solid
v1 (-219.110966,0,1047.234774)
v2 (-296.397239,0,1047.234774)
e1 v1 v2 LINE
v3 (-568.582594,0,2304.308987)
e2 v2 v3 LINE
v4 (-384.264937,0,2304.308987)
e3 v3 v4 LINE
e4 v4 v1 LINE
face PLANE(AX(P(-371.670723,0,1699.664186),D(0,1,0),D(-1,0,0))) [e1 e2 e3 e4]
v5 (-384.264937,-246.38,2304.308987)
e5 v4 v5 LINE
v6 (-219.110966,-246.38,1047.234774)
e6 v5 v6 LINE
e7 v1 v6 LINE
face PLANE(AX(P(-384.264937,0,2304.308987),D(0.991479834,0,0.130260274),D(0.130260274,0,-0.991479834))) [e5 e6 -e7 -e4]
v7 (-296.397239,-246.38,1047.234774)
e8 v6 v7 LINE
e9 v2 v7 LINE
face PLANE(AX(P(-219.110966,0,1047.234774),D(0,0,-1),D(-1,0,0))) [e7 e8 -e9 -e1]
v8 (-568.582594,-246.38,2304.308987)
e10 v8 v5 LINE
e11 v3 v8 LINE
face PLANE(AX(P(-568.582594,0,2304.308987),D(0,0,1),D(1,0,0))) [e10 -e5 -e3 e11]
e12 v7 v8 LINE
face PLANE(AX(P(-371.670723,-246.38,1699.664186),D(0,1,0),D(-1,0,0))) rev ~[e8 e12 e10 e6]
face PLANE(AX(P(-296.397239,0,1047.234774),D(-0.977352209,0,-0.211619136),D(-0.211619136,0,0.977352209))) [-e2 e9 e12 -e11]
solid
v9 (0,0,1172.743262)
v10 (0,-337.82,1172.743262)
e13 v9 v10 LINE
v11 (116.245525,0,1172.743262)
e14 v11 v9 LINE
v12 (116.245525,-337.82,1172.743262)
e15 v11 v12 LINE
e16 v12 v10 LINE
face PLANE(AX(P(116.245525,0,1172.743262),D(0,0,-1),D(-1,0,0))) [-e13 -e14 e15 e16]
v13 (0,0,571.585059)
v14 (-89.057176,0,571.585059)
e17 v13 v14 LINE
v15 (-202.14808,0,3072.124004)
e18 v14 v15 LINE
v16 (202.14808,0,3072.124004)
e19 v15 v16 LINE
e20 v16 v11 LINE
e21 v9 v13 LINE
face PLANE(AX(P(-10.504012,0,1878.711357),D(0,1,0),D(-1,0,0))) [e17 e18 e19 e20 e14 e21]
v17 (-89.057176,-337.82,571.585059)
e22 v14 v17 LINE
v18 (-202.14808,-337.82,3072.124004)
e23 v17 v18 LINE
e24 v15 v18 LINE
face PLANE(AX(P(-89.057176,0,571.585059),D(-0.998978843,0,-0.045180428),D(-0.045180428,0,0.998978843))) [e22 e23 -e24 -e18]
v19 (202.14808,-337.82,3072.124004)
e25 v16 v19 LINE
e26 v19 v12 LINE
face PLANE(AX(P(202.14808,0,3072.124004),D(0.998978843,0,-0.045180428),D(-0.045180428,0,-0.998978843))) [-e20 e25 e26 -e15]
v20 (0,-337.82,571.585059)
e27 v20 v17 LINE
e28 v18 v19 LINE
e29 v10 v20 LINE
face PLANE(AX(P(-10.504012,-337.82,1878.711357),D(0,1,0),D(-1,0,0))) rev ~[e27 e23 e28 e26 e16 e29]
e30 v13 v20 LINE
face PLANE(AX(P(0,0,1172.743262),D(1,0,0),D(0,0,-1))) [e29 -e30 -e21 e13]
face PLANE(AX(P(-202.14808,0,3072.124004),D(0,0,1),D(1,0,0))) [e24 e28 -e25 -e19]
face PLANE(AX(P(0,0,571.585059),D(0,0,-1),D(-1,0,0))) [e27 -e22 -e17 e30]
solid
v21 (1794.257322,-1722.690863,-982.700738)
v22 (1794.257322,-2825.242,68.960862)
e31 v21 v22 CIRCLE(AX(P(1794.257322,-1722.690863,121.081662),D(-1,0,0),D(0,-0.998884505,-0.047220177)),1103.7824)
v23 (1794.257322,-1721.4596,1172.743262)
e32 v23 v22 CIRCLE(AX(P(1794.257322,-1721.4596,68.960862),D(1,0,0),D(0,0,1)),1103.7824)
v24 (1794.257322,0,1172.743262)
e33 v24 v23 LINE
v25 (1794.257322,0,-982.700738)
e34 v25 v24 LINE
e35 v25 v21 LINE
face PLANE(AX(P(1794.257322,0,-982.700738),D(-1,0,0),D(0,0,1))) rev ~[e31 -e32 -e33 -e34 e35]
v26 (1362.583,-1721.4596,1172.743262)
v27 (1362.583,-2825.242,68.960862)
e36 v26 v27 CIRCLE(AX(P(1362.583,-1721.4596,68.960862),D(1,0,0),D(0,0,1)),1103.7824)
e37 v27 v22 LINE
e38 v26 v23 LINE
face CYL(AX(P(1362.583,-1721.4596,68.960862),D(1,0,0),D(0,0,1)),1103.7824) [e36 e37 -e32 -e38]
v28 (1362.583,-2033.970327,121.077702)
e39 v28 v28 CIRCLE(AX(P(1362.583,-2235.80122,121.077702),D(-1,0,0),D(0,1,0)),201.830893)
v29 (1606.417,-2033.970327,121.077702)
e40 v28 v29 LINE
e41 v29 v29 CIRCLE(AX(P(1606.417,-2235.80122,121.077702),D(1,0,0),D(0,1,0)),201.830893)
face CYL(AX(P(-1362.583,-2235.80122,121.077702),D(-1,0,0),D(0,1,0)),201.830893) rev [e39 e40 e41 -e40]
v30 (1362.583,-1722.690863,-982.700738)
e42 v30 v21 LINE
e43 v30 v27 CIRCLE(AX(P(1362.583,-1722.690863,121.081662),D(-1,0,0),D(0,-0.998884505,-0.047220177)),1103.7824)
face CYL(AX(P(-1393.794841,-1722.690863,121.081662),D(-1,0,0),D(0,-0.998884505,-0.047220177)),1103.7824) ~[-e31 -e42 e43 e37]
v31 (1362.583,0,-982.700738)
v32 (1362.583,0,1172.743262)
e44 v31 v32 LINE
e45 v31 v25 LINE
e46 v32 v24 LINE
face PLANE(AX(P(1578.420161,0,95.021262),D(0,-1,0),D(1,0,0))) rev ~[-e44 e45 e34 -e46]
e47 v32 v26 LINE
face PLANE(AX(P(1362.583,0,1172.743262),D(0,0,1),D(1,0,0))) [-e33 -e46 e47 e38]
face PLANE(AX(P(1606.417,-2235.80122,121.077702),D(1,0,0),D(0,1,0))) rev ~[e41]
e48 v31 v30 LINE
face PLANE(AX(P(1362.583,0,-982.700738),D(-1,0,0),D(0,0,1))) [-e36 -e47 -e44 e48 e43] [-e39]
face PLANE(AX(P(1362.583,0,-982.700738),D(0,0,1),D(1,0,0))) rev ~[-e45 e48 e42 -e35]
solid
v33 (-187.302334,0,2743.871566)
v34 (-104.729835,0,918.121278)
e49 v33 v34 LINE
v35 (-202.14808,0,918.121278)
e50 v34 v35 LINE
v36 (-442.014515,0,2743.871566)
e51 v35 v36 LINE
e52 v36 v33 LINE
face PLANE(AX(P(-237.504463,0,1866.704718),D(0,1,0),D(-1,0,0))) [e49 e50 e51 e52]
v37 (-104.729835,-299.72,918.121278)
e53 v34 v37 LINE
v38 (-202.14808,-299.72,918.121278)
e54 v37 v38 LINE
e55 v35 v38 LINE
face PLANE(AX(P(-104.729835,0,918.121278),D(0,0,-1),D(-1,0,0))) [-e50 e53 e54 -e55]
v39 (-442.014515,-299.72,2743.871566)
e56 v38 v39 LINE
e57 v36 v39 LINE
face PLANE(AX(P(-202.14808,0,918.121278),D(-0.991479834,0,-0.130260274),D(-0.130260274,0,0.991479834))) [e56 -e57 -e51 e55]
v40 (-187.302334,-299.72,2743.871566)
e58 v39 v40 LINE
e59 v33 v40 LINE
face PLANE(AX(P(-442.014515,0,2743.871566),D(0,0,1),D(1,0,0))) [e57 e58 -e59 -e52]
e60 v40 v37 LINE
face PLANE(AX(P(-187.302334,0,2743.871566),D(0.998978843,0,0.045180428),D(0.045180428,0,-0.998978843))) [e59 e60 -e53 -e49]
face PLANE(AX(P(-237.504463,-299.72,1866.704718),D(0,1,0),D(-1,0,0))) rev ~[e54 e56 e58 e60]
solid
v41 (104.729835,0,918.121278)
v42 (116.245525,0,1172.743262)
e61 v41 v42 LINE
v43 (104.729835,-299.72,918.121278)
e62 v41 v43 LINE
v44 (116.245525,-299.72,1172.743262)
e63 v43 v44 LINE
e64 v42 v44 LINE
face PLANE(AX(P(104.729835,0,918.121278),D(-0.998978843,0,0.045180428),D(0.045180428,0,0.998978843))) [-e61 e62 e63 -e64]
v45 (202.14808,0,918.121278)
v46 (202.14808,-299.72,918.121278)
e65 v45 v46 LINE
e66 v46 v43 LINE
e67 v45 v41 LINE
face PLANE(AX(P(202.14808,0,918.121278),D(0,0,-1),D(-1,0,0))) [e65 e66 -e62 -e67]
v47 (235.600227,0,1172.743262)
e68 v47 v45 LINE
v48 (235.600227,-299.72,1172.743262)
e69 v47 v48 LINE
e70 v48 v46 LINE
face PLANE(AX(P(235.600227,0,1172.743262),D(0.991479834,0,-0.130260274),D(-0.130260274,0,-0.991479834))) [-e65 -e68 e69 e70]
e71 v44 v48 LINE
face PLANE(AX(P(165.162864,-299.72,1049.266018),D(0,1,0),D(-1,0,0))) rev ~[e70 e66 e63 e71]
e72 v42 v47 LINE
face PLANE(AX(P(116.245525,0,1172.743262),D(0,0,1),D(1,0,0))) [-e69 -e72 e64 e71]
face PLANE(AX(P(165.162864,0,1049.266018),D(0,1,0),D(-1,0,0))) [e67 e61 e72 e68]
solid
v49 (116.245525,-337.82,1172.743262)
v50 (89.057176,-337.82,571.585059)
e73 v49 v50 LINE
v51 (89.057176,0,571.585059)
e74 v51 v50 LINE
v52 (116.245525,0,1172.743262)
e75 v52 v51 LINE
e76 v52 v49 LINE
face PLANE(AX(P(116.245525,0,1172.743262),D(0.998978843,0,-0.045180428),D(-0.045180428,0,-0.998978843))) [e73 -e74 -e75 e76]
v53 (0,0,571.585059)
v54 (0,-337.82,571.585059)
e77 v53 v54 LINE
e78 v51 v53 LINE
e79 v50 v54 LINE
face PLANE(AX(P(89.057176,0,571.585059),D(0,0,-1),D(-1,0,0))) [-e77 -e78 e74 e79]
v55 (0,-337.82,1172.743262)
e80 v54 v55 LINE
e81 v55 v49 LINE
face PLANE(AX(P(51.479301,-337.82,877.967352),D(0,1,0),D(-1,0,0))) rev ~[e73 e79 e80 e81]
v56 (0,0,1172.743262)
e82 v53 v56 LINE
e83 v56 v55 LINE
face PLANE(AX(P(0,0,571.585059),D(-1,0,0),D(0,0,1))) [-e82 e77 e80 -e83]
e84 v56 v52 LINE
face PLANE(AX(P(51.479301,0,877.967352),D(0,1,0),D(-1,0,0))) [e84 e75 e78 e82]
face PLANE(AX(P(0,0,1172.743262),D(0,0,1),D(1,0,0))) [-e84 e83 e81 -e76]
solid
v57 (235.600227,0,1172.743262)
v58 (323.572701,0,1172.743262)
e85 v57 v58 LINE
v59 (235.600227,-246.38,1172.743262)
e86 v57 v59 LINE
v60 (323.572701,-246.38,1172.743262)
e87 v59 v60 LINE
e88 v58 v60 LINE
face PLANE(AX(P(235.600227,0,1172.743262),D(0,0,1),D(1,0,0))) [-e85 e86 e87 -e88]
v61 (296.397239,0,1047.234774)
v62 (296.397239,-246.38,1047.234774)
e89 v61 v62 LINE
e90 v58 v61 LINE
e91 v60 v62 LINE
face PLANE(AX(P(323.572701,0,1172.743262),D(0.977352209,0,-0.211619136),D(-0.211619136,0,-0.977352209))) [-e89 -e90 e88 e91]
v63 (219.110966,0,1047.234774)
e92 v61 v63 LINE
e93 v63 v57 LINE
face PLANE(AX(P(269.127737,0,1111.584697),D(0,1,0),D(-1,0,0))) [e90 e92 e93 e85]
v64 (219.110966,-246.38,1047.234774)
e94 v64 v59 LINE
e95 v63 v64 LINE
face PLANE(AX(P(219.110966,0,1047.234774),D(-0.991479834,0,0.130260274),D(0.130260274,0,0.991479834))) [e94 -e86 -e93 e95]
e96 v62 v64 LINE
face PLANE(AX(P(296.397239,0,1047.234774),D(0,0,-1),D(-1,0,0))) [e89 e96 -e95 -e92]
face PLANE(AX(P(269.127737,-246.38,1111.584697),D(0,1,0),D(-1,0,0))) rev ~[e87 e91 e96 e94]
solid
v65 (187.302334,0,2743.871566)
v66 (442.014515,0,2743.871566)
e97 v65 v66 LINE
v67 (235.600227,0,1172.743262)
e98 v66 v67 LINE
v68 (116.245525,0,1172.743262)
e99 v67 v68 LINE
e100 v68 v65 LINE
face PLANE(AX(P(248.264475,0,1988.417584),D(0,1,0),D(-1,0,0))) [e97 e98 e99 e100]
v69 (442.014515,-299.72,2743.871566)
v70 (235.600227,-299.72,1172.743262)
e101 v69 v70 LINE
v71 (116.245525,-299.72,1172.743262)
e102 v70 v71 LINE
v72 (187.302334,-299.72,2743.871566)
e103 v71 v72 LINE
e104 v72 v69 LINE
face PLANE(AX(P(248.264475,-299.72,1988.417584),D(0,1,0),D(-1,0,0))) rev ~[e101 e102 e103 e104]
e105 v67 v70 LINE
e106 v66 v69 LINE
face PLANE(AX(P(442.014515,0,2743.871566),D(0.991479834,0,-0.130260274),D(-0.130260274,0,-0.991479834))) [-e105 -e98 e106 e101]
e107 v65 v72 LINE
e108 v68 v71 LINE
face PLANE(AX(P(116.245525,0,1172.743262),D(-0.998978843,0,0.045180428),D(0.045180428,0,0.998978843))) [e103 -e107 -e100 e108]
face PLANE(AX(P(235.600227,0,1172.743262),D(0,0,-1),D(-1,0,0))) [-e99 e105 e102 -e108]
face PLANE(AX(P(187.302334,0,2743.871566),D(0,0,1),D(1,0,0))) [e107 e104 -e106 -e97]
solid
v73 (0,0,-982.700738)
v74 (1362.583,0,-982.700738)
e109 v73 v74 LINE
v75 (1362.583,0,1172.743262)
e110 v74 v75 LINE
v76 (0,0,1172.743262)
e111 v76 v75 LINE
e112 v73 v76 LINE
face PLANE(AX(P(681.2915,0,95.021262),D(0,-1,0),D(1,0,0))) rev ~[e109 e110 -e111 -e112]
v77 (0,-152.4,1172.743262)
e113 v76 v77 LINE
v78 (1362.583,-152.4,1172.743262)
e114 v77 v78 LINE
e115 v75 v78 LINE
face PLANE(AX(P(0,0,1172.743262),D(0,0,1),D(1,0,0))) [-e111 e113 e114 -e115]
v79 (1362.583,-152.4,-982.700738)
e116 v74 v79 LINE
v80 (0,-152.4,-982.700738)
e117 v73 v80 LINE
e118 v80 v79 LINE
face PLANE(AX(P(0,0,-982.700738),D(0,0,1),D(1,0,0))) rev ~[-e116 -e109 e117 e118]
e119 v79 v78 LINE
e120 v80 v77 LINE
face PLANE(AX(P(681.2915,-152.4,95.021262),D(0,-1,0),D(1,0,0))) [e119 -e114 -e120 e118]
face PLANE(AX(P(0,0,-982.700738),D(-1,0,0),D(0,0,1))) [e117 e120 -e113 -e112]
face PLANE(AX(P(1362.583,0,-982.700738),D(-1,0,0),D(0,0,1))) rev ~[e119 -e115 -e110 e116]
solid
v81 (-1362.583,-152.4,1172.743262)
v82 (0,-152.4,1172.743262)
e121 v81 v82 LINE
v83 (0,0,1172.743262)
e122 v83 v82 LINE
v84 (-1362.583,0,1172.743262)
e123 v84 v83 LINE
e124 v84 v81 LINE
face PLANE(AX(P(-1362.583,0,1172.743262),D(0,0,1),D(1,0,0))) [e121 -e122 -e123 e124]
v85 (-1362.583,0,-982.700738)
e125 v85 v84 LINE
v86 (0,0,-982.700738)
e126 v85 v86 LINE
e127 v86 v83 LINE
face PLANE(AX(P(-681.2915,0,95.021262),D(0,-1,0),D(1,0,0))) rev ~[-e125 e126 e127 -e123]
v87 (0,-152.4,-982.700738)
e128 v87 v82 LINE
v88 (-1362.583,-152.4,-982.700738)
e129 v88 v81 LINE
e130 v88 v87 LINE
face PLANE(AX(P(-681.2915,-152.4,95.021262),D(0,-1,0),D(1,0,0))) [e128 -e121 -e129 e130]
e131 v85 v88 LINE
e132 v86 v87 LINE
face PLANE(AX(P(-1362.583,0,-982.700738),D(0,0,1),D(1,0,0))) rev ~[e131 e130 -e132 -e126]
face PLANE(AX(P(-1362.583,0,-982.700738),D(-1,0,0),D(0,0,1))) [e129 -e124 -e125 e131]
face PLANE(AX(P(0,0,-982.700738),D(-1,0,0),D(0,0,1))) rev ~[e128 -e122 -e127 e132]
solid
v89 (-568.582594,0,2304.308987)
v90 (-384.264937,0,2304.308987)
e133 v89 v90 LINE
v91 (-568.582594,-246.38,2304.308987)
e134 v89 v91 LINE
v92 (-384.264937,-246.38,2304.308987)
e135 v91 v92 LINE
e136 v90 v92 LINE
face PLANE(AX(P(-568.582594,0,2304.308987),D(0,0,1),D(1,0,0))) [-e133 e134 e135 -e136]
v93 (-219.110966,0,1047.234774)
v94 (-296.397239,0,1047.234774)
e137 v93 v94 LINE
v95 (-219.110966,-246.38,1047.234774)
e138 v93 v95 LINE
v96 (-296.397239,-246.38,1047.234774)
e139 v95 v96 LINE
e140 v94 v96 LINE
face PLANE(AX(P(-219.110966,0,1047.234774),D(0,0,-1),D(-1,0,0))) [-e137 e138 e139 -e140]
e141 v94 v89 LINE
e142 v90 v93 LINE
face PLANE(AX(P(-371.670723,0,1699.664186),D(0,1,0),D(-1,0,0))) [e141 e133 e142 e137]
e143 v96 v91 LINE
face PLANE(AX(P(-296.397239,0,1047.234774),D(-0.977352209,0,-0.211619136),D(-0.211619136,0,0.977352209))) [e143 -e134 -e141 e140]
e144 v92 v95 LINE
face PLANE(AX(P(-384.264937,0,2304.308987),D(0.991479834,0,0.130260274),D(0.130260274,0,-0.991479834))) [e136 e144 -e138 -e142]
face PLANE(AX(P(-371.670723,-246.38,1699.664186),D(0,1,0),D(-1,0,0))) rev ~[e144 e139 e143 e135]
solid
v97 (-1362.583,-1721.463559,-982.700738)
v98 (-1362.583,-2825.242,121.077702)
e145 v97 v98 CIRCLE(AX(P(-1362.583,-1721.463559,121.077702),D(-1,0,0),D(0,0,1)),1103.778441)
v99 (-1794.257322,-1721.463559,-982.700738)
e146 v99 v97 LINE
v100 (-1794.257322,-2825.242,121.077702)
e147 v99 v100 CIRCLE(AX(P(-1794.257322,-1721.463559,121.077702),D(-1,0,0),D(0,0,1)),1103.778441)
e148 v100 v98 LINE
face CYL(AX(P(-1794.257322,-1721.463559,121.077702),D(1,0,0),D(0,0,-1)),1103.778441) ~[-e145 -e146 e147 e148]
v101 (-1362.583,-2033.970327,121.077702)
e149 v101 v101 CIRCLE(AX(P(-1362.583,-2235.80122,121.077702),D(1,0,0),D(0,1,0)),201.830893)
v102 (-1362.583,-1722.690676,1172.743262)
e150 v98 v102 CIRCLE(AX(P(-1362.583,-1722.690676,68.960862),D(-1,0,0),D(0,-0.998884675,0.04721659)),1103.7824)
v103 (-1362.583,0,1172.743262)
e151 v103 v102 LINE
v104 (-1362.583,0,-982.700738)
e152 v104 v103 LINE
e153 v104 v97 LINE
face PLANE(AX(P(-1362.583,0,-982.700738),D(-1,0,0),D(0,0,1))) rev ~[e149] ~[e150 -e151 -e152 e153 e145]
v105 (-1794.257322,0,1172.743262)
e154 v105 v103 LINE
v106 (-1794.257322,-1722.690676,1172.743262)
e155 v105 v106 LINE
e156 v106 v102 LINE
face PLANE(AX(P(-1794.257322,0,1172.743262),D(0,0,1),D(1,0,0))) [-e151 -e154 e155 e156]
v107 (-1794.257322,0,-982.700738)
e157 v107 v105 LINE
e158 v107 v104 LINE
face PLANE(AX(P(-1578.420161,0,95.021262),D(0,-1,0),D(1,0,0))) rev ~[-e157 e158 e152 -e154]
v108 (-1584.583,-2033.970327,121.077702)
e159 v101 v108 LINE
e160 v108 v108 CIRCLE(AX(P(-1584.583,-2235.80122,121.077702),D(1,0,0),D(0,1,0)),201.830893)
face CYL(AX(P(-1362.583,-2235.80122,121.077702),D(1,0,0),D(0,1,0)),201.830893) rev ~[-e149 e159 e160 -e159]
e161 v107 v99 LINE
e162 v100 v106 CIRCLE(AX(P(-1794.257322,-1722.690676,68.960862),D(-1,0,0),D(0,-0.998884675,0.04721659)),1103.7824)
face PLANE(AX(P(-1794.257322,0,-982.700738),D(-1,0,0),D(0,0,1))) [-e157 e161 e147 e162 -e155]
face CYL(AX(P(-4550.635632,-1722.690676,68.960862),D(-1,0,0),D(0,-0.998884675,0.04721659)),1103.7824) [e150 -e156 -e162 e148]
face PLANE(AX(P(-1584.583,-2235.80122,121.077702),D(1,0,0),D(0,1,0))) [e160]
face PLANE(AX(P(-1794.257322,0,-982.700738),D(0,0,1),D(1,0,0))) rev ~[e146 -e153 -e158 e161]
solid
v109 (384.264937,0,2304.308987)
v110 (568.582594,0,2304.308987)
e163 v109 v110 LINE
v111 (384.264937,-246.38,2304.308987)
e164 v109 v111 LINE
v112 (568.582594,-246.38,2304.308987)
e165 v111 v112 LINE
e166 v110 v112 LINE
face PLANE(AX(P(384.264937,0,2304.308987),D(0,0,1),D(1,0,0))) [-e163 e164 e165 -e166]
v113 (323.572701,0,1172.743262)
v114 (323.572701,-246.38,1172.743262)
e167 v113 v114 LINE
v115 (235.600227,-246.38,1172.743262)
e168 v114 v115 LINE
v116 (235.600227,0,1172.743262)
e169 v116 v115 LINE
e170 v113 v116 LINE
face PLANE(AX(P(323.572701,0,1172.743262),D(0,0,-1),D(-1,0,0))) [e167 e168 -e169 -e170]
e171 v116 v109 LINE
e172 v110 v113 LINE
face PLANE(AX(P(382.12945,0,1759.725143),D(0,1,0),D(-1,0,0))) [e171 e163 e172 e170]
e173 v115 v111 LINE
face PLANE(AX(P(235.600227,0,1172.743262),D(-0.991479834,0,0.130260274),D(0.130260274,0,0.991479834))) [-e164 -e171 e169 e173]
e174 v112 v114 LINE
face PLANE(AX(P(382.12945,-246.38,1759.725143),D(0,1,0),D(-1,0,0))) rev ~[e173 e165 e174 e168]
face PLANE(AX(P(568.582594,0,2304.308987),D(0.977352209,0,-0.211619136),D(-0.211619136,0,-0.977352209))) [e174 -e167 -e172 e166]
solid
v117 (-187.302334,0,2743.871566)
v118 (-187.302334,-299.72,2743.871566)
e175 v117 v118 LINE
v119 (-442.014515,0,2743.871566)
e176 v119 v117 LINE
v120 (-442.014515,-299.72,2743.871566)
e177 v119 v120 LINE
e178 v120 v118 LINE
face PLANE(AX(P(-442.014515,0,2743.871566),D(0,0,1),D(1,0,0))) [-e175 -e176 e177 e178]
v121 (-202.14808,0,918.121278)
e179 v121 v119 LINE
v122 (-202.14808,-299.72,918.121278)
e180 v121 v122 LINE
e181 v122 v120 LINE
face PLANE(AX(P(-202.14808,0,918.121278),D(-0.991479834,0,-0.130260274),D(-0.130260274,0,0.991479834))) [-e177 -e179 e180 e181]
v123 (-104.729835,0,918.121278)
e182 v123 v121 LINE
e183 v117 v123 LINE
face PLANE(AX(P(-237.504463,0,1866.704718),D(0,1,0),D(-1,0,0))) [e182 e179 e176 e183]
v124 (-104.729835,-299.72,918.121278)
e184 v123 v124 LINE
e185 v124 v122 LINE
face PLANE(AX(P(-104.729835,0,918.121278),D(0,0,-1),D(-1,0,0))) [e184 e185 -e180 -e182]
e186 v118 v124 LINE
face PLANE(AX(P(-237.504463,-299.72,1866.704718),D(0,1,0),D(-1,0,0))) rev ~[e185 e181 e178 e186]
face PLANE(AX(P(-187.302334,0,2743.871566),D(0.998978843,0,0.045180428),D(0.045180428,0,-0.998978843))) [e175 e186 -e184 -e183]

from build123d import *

# Parameters (mm, degrees)
F0_W         = 431.6743224388
F0_H         = 2155.444
F1_DEPTH     = 2825.242
F0_W_2       = 1362.583
F2_DEPTH     = 152.4
F3_R         = 1103.778440717
F4_T1_DEPTH  = 5944.4309410994
F6_DEPTH     = 337.82
F7_DEPTH     = 337.82
F8_DEPTH     = 299.72
F9_DEPTH     = 299.72
F10_DEPTH    = 299.72
F11_DEPTH    = 299.72
F12_DEPTH    = 246.38
F13_DEPTH    = 246.38
F14_DEPTH    = 246.38
F15_DEPTH    = 246.38
F16_DEPTH    = 152.4
F17_DEPTH    = 2825.242
F18_R        = 1103.7824
F19_T1_DEPTH = 5944.4300053009
F20_R        = 201.8308928609
F21_DEPTH    = 222
F22_DEPTH    = 2969


# Not quite as in the source:
# - a fillet or chamfer that OpenCascade refuses, or shapes differently, is made with other operations: its cross-section is extruded or revolved along the edge and cut away or added


with BuildPart() as f1:
    # F0 (on Front) → F1 (new body)
    with BuildSketch(Plane.XZ):
        with Locations((-1578.4201612194, 95.021261747)):
            Rectangle(F0_W, F0_H)
    extrude(amount=F1_DEPTH)

    # F3
    f3_edges = [f1.edges().sort_by_distance(p)[0] for p in [
        (-1578.420161, -2825.242, -982.700738),
    ]]
    fillet(f3_edges, radius=F3_R)

    # F4: fillet of radius 1103.7824 on 1 edges, made by hand

    # F4_s2 → F4_t1 (cut)
    with BuildSketch(Plane.YZ.offset(-4550.6356317691)):
        with BuildLine():
            ThreePointArc((-2825.242, 121.077702464), (-2484.5338146575, 867.6664514598), (-1722.6906762679, 1172.743261747))
            Line((-1722.6906762679, 1172.743261747), (-2825.242, 1172.743261747))
            Line((-2825.242, 1172.743261747), (-2825.242, 121.077702464))
        make_face()
    extrude(amount=F4_T1_DEPTH, mode=Mode.SUBTRACT)

    # F20 (on face) → F21 (cut)
    with BuildSketch(Plane.YZ.offset(-1362.583)):
        with Locations((-2235.8012199402, 121.077702464)):
            Circle(F20_R)
    extrude(amount=-F21_DEPTH, mode=Mode.SUBTRACT)


with BuildPart() as f2:
    # F0 (on Front) → F2 (new body)
    with BuildSketch(Plane.XZ):
        with Locations((681.2915, 95.021261747)):
            Rectangle(F0_W_2, F0_H)
    extrude(amount=F2_DEPTH)


with BuildPart() as f6:
    # F5 (on face) → F6 (new body)
    with BuildSketch(Plane(origin=(0, 0, 0), x_dir=(-1, 0, 0), z_dir=(0, 1, 0))):
        Polygon((202.1480798721, 3072.124004364), (0, 3072.124004364), (-202.1480798721, 3072.124004364), (-187.3023343028, 2743.8715661091), (-116.2455245279, 1172.743261747), (0, 1172.743261747), (0, 571.585059166), (89.0571759208, 571.585059166), (104.7298349479, 918.121278286), (187.3023343028, 2743.8715661091), align=None)
    extrude(amount=-F6_DEPTH)


with BuildPart() as f7:
    # F5 (on face) → F7 (new body)
    with BuildSketch(Plane(origin=(0, 0, 0), x_dir=(-1, 0, 0), z_dir=(0, 1, 0))):
        Polygon((0, 1172.743261747), (-116.2455245279, 1172.743261747), (-104.7298349479, 918.121278286), (-89.0571759208, 571.585059166), (0, 571.585059166), align=None)
    extrude(amount=-F7_DEPTH)


with BuildPart() as f8:
    # F5 (on face) → F8 (new body)
    with BuildSketch(Plane(origin=(0, 0, 0), x_dir=(-1, 0, 0), z_dir=(0, 1, 0))):
        Polygon((-116.2455245279, 1172.743261747), (-187.3023343028, 2743.8715661091), (-442.0145153999, 2743.8715661091), (-384.2649371563, 2304.3089867597), (-235.6002271823, 1172.743261747), align=None)
    extrude(amount=-F8_DEPTH)


with BuildPart() as f9:
    # F5 (on face) → F9 (new body)
    with BuildSketch(Plane(origin=(0, 0, 0), x_dir=(-1, 0, 0), z_dir=(0, 1, 0))):
        Polygon((-104.7298349479, 918.121278286), (-116.2455245279, 1172.743261747), (-235.6002271823, 1172.743261747), (-219.1109658235, 1047.2347736359), (-202.1480798721, 918.121278286), align=None)
    extrude(amount=-F9_DEPTH)


with BuildPart() as f10:
    # F5 (on face) → F10 (new body)
    with BuildSketch(Plane(origin=(0, 0, 0), x_dir=(-1, 0, 0), z_dir=(0, 1, 0))):
        Polygon((442.0145153999, 2743.8715661091), (187.3023343028, 2743.8715661091), (104.7298349479, 918.121278286), (202.1480798721, 918.121278286), (219.1109658235, 1047.2347736359), (384.2649371563, 2304.3089867597), align=None)
    extrude(amount=-F10_DEPTH)


with BuildPart() as f11:
    # F5 (on face) → F11 (new body)
    with BuildSketch(Plane(origin=(0, 0, 0), x_dir=(-1, 0, 0), z_dir=(0, 1, 0))):
        Polygon((442.0145153999, 2743.8715661091), (187.3023343028, 2743.8715661091), (104.7298349479, 918.121278286), (202.1480798721, 918.121278286), (219.1109658235, 1047.2347736359), (384.2649371563, 2304.3089867597), align=None)
    extrude(amount=-F11_DEPTH)


with BuildPart() as f12:
    # F5 (on face) → F12 (new body)
    with BuildSketch(Plane(origin=(0, 0, 0), x_dir=(-1, 0, 0), z_dir=(0, 1, 0))):
        Polygon((-323.5727009185, 1172.743261747), (-235.6002271823, 1172.743261747), (-384.2649371563, 2304.3089867597), (-568.5825943947, 2304.3089867597), align=None)
    extrude(amount=-F12_DEPTH)


with BuildPart() as f13:
    # F5 (on face) → F13 (new body)
    with BuildSketch(Plane(origin=(0, 0, 0), x_dir=(-1, 0, 0), z_dir=(0, 1, 0))):
        Polygon((-219.1109658235, 1047.2347736359), (-235.6002271823, 1172.743261747), (-323.5727009185, 1172.743261747), (-296.3972389698, 1047.2347736359), align=None)
    extrude(amount=-F13_DEPTH)


with BuildPart() as f14:
    # F5 (on face) → F14 (new body)
    with BuildSketch(Plane(origin=(0, 0, 0), x_dir=(-1, 0, 0), z_dir=(0, 1, 0))):
        Polygon((568.5825943947, 2304.3089867597), (384.2649371563, 2304.3089867597), (219.1109658235, 1047.2347736359), (296.3972389698, 1047.2347736359), align=None)
    extrude(amount=-F14_DEPTH)


with BuildPart() as f15:
    # F5 (on face) → F15 (new body)
    with BuildSketch(Plane(origin=(0, 0, 0), x_dir=(-1, 0, 0), z_dir=(0, 1, 0))):
        Polygon((568.5825943947, 2304.3089867597), (384.2649371563, 2304.3089867597), (219.1109658235, 1047.2347736359), (296.3972389698, 1047.2347736359), align=None)
    extrude(amount=-F15_DEPTH)


with BuildPart() as f16:
    # F0 (on Front) → F16 (new body)
    with BuildSketch(Plane.XZ):
        with Locations((-681.2915, 95.021261747)):
            Rectangle(F0_W_2, F0_H)
    extrude(amount=F16_DEPTH)


with BuildPart() as f17:
    # F0 (on Front) → F17 (new body)
    with BuildSketch(Plane.XZ):
        with Locations((1578.4201612194, 95.021261747)):
            Rectangle(F0_W, F0_H)
    extrude(amount=F17_DEPTH)

    # F18
    f18_edges = [f17.edges().sort_by_distance(p)[0] for p in [
        (1578.420161, -2825.242, 1172.743262),
    ]]
    fillet(f18_edges, radius=F18_R)

    # F19: fillet of radius 1103.7824 on 1 edges, made by hand

    # F19_s2 → F19_t1 (cut)
    with BuildSketch(Plane.YZ.offset(-1393.794841431)):
        with BuildLine():
            ThreePointArc((-2825.242, 68.960861747), (-2484.5325677323, -677.6252958612), (-1722.6908634276, -982.700738253))
            Line((-1722.6908634276, -982.700738253), (-2825.242, -982.700738253))
            Line((-2825.242, -982.700738253), (-2825.242, 68.960861747))
        make_face()
    extrude(amount=F19_T1_DEPTH, mode=Mode.SUBTRACT)

    # F20 (on face) → F22 (cut)
    with BuildSketch(Plane.YZ.offset(-1362.583)):
        with Locations((-2235.8012199402, 121.077702464)):
            Circle(F20_R)
    extrude(amount=F22_DEPTH, mode=Mode.SUBTRACT)


solid = Compound([f1.part, f2.part, f6.part, f7.part, f8.part, f9.part, f10.part, f11.part, f12.part, f13.part, f14.part, f15.part, f16.part, f17.part])
